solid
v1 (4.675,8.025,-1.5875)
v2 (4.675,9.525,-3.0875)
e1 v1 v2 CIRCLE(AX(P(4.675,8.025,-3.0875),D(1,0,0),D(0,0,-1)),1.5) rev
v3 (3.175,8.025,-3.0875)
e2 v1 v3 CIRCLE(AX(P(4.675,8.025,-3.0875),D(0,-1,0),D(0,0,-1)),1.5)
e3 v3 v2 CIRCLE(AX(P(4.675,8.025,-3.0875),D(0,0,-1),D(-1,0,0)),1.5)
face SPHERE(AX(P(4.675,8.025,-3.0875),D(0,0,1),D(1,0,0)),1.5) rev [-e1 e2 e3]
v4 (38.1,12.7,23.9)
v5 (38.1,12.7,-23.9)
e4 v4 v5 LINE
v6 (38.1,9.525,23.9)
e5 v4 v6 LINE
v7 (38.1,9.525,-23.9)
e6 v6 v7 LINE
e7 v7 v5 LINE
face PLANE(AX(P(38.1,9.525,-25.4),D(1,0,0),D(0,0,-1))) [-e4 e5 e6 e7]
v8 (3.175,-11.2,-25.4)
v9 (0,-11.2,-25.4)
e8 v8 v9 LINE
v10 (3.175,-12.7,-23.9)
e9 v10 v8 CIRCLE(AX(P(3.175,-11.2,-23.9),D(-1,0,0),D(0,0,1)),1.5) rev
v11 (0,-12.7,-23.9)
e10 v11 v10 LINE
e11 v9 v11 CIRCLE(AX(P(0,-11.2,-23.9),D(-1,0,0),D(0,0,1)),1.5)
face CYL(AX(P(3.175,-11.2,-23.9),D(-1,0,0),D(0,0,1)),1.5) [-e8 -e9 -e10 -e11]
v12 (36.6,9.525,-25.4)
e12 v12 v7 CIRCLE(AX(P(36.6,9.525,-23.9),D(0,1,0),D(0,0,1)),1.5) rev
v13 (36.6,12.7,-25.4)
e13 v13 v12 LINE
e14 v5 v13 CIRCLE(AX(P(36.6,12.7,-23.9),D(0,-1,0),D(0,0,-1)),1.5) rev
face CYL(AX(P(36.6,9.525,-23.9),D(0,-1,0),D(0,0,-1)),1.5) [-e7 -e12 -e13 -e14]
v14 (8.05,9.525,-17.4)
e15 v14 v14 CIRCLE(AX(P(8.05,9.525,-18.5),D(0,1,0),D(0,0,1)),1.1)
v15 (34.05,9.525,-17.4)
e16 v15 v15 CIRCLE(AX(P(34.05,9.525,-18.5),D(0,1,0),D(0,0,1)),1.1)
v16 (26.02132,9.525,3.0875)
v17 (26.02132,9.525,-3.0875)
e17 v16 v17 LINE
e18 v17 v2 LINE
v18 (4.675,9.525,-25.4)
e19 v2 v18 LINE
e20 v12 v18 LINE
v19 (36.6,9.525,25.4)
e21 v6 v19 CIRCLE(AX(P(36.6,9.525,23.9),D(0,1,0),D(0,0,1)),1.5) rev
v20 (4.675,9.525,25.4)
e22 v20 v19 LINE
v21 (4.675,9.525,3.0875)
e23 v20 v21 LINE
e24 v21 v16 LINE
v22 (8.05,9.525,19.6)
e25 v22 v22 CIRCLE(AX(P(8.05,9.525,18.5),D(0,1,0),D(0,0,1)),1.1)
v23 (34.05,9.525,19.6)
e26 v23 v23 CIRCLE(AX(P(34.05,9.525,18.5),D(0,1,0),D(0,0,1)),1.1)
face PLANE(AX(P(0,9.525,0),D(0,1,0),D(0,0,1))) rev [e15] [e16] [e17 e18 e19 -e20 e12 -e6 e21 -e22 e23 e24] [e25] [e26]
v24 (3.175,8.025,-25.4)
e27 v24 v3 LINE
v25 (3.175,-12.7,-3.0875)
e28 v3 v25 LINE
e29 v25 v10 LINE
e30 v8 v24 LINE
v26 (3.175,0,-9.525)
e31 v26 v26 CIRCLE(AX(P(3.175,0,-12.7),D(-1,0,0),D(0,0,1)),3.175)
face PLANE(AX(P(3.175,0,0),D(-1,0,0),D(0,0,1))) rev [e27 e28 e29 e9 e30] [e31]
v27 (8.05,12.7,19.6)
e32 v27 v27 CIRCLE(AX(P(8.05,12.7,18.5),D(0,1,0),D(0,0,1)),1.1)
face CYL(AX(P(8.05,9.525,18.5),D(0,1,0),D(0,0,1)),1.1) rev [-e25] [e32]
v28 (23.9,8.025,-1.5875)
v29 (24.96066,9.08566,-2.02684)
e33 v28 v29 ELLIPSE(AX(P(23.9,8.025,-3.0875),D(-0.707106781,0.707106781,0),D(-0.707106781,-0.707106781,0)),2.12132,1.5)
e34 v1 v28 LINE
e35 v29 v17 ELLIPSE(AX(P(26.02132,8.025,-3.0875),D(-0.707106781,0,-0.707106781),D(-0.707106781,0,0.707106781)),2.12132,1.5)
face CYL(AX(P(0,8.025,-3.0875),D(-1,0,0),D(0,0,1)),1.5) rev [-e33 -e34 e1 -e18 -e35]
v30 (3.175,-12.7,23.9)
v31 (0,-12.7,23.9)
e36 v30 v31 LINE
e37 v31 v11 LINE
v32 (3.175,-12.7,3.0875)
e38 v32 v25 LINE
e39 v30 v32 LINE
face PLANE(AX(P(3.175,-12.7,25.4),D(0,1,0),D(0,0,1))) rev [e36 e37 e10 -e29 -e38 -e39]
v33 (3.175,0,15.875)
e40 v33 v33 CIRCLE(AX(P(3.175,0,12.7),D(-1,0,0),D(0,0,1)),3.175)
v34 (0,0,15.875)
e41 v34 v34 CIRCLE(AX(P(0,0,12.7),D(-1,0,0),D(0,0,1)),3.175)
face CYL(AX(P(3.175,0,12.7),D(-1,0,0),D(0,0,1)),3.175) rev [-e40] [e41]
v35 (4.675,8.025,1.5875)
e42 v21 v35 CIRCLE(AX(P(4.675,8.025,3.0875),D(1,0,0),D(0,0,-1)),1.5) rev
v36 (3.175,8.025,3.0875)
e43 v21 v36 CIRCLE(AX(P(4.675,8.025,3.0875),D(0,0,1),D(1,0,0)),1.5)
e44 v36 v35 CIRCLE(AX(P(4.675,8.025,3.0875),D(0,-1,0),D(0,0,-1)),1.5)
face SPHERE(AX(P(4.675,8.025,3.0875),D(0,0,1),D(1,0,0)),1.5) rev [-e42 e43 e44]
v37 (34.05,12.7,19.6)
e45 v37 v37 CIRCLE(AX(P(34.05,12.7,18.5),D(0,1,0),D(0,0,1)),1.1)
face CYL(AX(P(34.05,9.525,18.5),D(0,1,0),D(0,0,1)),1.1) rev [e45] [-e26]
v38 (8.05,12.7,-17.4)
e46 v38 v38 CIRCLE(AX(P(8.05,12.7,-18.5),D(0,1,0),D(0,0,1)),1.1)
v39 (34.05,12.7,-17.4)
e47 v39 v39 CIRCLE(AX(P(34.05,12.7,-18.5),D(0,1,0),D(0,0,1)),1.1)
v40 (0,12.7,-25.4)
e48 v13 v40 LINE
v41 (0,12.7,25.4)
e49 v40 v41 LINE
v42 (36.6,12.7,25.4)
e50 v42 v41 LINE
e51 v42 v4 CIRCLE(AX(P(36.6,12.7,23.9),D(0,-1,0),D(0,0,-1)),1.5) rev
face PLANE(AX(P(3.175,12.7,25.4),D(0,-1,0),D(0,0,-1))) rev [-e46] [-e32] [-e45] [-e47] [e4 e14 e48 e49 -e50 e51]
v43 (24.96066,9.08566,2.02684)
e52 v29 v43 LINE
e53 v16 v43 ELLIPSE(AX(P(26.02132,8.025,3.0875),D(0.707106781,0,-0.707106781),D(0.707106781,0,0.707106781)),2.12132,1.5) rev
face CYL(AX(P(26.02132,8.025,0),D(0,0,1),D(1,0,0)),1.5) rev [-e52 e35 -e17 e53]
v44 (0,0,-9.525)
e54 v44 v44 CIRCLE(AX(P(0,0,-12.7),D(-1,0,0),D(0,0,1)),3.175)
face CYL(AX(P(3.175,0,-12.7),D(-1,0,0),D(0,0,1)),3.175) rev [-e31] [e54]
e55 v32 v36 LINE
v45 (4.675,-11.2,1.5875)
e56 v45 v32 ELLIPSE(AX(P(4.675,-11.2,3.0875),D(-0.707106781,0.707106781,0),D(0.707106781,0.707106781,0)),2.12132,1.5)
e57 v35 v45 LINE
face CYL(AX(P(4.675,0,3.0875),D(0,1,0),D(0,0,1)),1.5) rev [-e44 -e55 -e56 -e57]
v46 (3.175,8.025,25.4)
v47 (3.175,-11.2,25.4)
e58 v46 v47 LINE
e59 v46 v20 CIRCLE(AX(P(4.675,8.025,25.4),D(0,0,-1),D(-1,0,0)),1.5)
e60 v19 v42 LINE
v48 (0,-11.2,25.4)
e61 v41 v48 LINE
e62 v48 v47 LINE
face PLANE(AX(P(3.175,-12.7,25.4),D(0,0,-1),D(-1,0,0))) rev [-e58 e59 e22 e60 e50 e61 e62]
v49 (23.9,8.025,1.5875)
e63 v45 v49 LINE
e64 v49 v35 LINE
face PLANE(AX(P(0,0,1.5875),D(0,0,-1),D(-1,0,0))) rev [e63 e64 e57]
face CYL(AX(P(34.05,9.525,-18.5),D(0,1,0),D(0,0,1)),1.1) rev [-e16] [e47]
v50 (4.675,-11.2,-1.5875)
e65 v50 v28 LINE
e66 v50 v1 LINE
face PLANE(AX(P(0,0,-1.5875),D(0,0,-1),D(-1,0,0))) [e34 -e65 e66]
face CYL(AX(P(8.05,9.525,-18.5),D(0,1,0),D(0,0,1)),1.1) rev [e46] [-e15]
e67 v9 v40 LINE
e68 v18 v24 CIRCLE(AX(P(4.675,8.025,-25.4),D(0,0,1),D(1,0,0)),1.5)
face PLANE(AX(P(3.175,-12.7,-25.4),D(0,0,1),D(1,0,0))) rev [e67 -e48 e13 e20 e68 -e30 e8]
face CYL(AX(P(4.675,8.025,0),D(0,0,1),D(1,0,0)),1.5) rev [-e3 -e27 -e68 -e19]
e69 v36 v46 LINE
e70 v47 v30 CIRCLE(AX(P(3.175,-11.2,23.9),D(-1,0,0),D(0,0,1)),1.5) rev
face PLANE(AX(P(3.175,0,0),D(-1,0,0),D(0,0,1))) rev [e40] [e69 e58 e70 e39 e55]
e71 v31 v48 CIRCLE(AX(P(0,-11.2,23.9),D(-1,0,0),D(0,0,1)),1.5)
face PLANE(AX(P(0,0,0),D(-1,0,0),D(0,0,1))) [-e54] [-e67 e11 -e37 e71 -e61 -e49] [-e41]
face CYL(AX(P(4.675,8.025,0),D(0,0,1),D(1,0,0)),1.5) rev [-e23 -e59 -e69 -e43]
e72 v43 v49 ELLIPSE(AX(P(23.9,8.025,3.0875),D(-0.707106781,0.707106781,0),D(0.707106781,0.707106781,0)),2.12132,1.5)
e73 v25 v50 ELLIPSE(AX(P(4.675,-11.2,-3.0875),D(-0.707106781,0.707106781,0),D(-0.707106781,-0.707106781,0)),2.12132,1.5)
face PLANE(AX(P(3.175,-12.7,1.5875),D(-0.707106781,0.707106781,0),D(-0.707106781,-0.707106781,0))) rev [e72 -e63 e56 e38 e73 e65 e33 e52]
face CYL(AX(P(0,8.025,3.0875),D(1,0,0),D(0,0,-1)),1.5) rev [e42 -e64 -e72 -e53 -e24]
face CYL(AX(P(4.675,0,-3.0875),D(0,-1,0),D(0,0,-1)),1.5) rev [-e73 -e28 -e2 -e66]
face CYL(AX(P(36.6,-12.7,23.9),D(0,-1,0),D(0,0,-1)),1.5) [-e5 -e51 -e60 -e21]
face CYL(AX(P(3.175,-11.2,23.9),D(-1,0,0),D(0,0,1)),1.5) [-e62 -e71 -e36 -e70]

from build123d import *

# Parameters (mm, degrees)
SKETCH2_W           = 50.8
SKETCH2_H           = 25.4
BOSS_EXTRUDE1_DEPTH = 3.175
SKETCH4_W           = 38.1
SKETCH4_H           = 50.8
BOSS_EXTRUDE2_DEPTH = 3.175
SKETCH5_R           = 1.1
CUT_EXTRUDE1_DEPTH  = 3.175
SKETCH6_R           = 3.175
CUT_EXTRUDE2_DEPTH  = 3.175
BOSS_EXTRUDE3_DEPTH = 1.5875
FILLET3_R           = 1.5


with BuildPart() as part:
    # Sketch2 → Boss-Extrude1 (new body)
    with BuildSketch(Plane(origin=(0, 0, 0), x_dir=(0, 0, -1), z_dir=(1, 0, 0))):
        Rectangle(SKETCH2_W, SKETCH2_H)
    extrude(amount=BOSS_EXTRUDE1_DEPTH)

    # Sketch4 → Boss-Extrude2 (add)
    with BuildSketch(Plane(origin=(0, 12.7, 0), x_dir=(1, 0, 0), z_dir=(0, 1, 0))):
        with Locations((19.05, 0)):
            Rectangle(SKETCH4_W, SKETCH4_H)
    extrude(amount=-BOSS_EXTRUDE2_DEPTH)

    # Sketch5 → Cut-Extrude1 (cut)
    with BuildSketch(Plane(origin=(0, 12.7, 0), x_dir=(1, 0, 0), z_dir=(0, 1, 0))):
        with Locations(Location((8.05, 18.5, 0), (0, 0, 270))):
            Circle(SKETCH5_R)
        with Locations(Location((34.05, 18.5, 0), (0, 0, 270))):
            Circle(SKETCH5_R)
        with Locations(Location((34.05, -18.5, 0), (0, 0, 270))):
            Circle(SKETCH5_R)
        with Locations(Location((8.05, -18.5, 0), (0, 0, 270))):
            Circle(SKETCH5_R)
    extrude(amount=-CUT_EXTRUDE1_DEPTH, mode=Mode.SUBTRACT)

    # Sketch6 → Cut-Extrude2 (cut)
    with BuildSketch(Plane.ZY):
        with Locations((-12.7, 0)):
            Circle(SKETCH6_R)
        with Locations((12.7, 0)):
            Circle(SKETCH6_R)
    extrude(amount=-CUT_EXTRUDE2_DEPTH, mode=Mode.SUBTRACT)

    # Sketch7 → Boss-Extrude3 (add, symmetric)
    with BuildSketch(Plane.XY):
        Polygon((3.175, -12.7), (25.4, 9.525), (3.175, 9.525), align=None)
    extrude(amount=BOSS_EXTRUDE3_DEPTH, both=True)

    # Fillet3
    # the kernel refuses this fillet: 1.5 mm, written as the material it adds along each edge
    with BuildSketch(Plane(origin=(4.675, 8.025, 3.0875), x_dir=(-1, 0, 0), z_dir=(0, 1, 0))) as fillet3_piece_1_section:
        Polygon((0, 0), (FILLET3_R, 0), (FILLET3_R, -FILLET3_R), (0, -FILLET3_R), align=None)
    fillet3_piece_1 = extrude(amount=FILLET3_R, mode=Mode.PRIVATE)
    fillet3_piece_1 = fillet3_piece_1 - Plane(origin=(4.675, 8.025, 3.0875), x_dir=(0.7071067811865475, 0, 0.7071067811865475), z_dir=(0, 1, 0)) * Sphere(FILLET3_R, mode=Mode.PRIVATE)
    add(fillet3_piece_1)
    with BuildSketch(Plane(origin=(4.675, 8.025, -3.0875), x_dir=(0, 0, 1), z_dir=(0, 1, 0))) as fillet3_piece_2_section:
        Polygon((0, 0), (FILLET3_R, 0), (FILLET3_R, -FILLET3_R), (0, -FILLET3_R), align=None)
    fillet3_piece_2 = extrude(amount=FILLET3_R, mode=Mode.PRIVATE)
    fillet3_piece_2 = fillet3_piece_2 - Plane(origin=(4.675, 8.025, -3.0875), x_dir=(0.7071067811865475, 0, -0.7071067811865475), z_dir=(0, 1, 0)) * Sphere(FILLET3_R, mode=Mode.PRIVATE)
    add(fillet3_piece_2)
    with BuildSketch(Plane(origin=(3.175, 9.525, 25.4), x_dir=(0, -1, 0), z_dir=(0, 0, -1)), Plane(origin=(3.175, 9.525, -3.0875), x_dir=(0, -1, 0), z_dir=(0, 0, -1))) as fillet3_piece_3:
        with BuildLine():
            CenterArc((FILLET3_R, -FILLET3_R), FILLET3_R, 90, 90)
            Line((0, -FILLET3_R), (0, 0))
            Line((0, 0), (FILLET3_R, 0))
        make_face()
    extrude(amount=22.3125)
    with BuildSketch(Plane(origin=(29.15, 9.525, -1.5875), x_dir=(0, 0, -1), z_dir=(-1, 0, 0))) as fillet3_piece_4_section:
        with BuildLine():
            CenterArc((FILLET3_R, FILLET3_R), FILLET3_R, 180, 90)
            Line((0, FILLET3_R), (0, 0))
            Line((0, 0), (FILLET3_R, 0))
        make_face()
    fillet3_piece_4 = extrude(amount=24.475, mode=Mode.PRIVATE)
    fillet3_piece_4 = split(fillet3_piece_4, bisect_by=Plane(origin=(19.967902823, 4.092902823, -1.930123153), z_dir=(-0.707106781186549, 0.707106781186546, 0)), keep=Keep.TOP, mode=Mode.PRIVATE)
    add(fillet3_piece_4)
    with BuildSketch(Plane(origin=(25.4, 9.525, -1.5875), x_dir=(-0.7071067811865489, -0.7071067811865461, 0), z_dir=(0, 0, 1))) as fillet3_piece_5:
        with BuildLine():
            CenterArc((FILLET3_R * 0.414213562373, FILLET3_R), FILLET3_R, 225, 45)
            Line((-FILLET3_R * 0.292893218813, FILLET3_R * 0.292893218813), (0, 0))
            Line((0, 0), (FILLET3_R * 0.414213562373, 0))
        make_face()
    extrude(amount=3.175)
    with BuildSketch(Plane(origin=(3.175, 8.025, -1.5875), x_dir=(0, 0, -1), z_dir=(0, -1, 0))) as fillet3_piece_6_section:
        with BuildLine():
            CenterArc((FILLET3_R, FILLET3_R), FILLET3_R, 180, 90)
            Line((0, FILLET3_R), (0, 0))
            Line((0, 0), (FILLET3_R, 0))
        make_face()
    fillet3_piece_6 = extrude(amount=20.725, mode=Mode.PRIVATE)
    fillet3_piece_6 = split(fillet3_piece_6, bisect_by=Plane(origin=(8.60741784, -7.26758216, -1.930100054), z_dir=(-0.707106781186549, 0.707106781186546, 0)), keep=Keep.TOP, mode=Mode.PRIVATE)
    add(fillet3_piece_6)
    with BuildSketch(Plane(origin=(29.15, 9.525, 1.5875), x_dir=(0, 0, 1), z_dir=(-1, 0, 0))) as fillet3_piece_7_section:
        with BuildLine():
            CenterArc((FILLET3_R, -FILLET3_R), FILLET3_R, 90, 90)
            Line((0, -FILLET3_R), (0, 0))
            Line((0, 0), (FILLET3_R, 0))
        make_face()
    fillet3_piece_7 = extrude(amount=24.475, mode=Mode.PRIVATE)
    fillet3_piece_7 = split(fillet3_piece_7, bisect_by=Plane(origin=(19.967902823, 4.092902823, 1.930123153), z_dir=(-0.707106781186549, 0.707106781186546, 0)), keep=Keep.TOP, mode=Mode.PRIVATE)
    add(fillet3_piece_7)
    with BuildSketch(Plane(origin=(3.175, 8.025, 1.5875), x_dir=(0, 0, 1), z_dir=(0, -1, 0))) as fillet3_piece_8_section:
        with BuildLine():
            CenterArc((FILLET3_R, -FILLET3_R), FILLET3_R, 90, 90)
            Line((0, -FILLET3_R), (0, 0))
            Line((0, 0), (FILLET3_R, 0))
        make_face()
    fillet3_piece_8 = extrude(amount=20.725, mode=Mode.PRIVATE)
    fillet3_piece_8 = split(fillet3_piece_8, bisect_by=Plane(origin=(8.60741784, -7.26758216, 1.930100054), z_dir=(-0.707106781186549, 0.707106781186546, 0)), keep=Keep.TOP, mode=Mode.PRIVATE)
    add(fillet3_piece_8)
    with BuildSketch(Plane(origin=(25.4, 9.525, -3.140800859), x_dir=(-0.7071067811865446, -0.7071067811865503, 0), z_dir=(0, 0, 1))) as fillet3_piece_9a_section:
        with BuildLine():
            CenterArc((FILLET3_R * 0.414213562373, FILLET3_R), FILLET3_R, 225, 45)
            Line((-FILLET3_R * 0.292893218813, FILLET3_R * 0.292893218813), (0, 0))
            Line((0, 0), (FILLET3_R * 0.414213562373, 0))
        make_face()
    fillet3_piece_9a = extrude(amount=4.728300859, mode=Mode.PRIVATE)
    fillet3_piece_9a = split(fillet3_piece_9a, bisect_by=Plane(origin=(25.438403899, 9.432284787, -1.5875), z_dir=(0, 0, -1)), keep=Keep.TOP, mode=Mode.PRIVATE)
    with BuildSketch(Plane(origin=(29.15, 9.525, -1.5875), x_dir=(0, 0, -1), z_dir=(-1, 0, 0))) as fillet3_piece_9b_section:
        with BuildLine():
            CenterArc((FILLET3_R, FILLET3_R), FILLET3_R, 180, 90)
            Line((0, FILLET3_R), (0, 0))
            Line((0, 0), (FILLET3_R, 0))
        make_face()
    fillet3_piece_9b = extrude(amount=24.475, mode=Mode.PRIVATE)
    fillet3_piece_9b = split(fillet3_piece_9b, bisect_by=Plane(origin=(26.063627713, 10.188627713, -1.91198662), z_dir=(0.707106781186549, -0.707106781186546, 0)), keep=Keep.TOP, mode=Mode.PRIVATE)
    fillet3_piece_9 = fillet3_piece_9a & fillet3_piece_9b
    add(fillet3_piece_9)
    with BuildSketch(Plane(origin=(25.4, 9.525, -1.5875), x_dir=(-0.7071067811865489, -0.7071067811865461, 0), z_dir=(0, 0, 1))) as fillet3_piece_10a_section:
        with BuildLine():
            CenterArc((FILLET3_R * 0.414213562373, FILLET3_R), FILLET3_R, 225, 45)
            Line((-FILLET3_R * 0.292893218813, FILLET3_R * 0.292893218813), (0, 0))
            Line((0, 0), (FILLET3_R * 0.414213562373, 0))
        make_face()
    fillet3_piece_10a = extrude(amount=4.728300859, mode=Mode.PRIVATE)
    fillet3_piece_10a = split(fillet3_piece_10a, bisect_by=Plane(origin=(25.438403899, 9.432284787, 1.5875), z_dir=(0, 0, 1)), keep=Keep.TOP, mode=Mode.PRIVATE)
    with BuildSketch(Plane(origin=(29.15, 9.525, 1.5875), x_dir=(0, 0, 1), z_dir=(-1, 0, 0))) as fillet3_piece_10b_section:
        with BuildLine():
            CenterArc((FILLET3_R, -FILLET3_R), FILLET3_R, 90, 90)
            Line((0, -FILLET3_R), (0, 0))
            Line((0, 0), (FILLET3_R, 0))
        make_face()
    fillet3_piece_10b = extrude(amount=24.475, mode=Mode.PRIVATE)
    fillet3_piece_10b = split(fillet3_piece_10b, bisect_by=Plane(origin=(26.063627713, 10.188627713, 1.91198662), z_dir=(0.707106781186549, -0.707106781186546, 0)), keep=Keep.TOP, mode=Mode.PRIVATE)
    fillet3_piece_10 = fillet3_piece_10a & fillet3_piece_10b
    add(fillet3_piece_10)
    # the kernel refuses this fillet: 1.5 mm, written as the material it takes off along each edge
    with BuildSketch(Plane(origin=(38.1, 16.45, 25.4), x_dir=(0, 0, -1), z_dir=(0, -1, 0)), Plane(origin=(-3.75, -12.7, -25.4), x_dir=(0, 0, 1), z_dir=(1, 0, 0))) as fillet3_2_piece_1:
        with BuildLine():
            CenterArc((FILLET3_R, -FILLET3_R), FILLET3_R, 90, 90)
            Line((0, -FILLET3_R), (0, 0))
            Line((0, 0), (FILLET3_R, 0))
        make_face()
    extrude(amount=10.675, mode=Mode.SUBTRACT)
    with BuildSketch(Plane(origin=(38.1, 16.45, -25.4), x_dir=(0, 0, 1), z_dir=(0, -1, 0)), Plane(origin=(-3.75, -12.7, 25.4), x_dir=(0, 0, -1), z_dir=(1, 0, 0))) as fillet3_2_piece_2:
        with BuildLine():
            CenterArc((FILLET3_R, FILLET3_R), FILLET3_R, 180, 90)
            Line((0, FILLET3_R), (0, 0))
            Line((0, 0), (FILLET3_R, 0))
        make_face()
    extrude(amount=10.675, mode=Mode.SUBTRACT)


solid = part.part
